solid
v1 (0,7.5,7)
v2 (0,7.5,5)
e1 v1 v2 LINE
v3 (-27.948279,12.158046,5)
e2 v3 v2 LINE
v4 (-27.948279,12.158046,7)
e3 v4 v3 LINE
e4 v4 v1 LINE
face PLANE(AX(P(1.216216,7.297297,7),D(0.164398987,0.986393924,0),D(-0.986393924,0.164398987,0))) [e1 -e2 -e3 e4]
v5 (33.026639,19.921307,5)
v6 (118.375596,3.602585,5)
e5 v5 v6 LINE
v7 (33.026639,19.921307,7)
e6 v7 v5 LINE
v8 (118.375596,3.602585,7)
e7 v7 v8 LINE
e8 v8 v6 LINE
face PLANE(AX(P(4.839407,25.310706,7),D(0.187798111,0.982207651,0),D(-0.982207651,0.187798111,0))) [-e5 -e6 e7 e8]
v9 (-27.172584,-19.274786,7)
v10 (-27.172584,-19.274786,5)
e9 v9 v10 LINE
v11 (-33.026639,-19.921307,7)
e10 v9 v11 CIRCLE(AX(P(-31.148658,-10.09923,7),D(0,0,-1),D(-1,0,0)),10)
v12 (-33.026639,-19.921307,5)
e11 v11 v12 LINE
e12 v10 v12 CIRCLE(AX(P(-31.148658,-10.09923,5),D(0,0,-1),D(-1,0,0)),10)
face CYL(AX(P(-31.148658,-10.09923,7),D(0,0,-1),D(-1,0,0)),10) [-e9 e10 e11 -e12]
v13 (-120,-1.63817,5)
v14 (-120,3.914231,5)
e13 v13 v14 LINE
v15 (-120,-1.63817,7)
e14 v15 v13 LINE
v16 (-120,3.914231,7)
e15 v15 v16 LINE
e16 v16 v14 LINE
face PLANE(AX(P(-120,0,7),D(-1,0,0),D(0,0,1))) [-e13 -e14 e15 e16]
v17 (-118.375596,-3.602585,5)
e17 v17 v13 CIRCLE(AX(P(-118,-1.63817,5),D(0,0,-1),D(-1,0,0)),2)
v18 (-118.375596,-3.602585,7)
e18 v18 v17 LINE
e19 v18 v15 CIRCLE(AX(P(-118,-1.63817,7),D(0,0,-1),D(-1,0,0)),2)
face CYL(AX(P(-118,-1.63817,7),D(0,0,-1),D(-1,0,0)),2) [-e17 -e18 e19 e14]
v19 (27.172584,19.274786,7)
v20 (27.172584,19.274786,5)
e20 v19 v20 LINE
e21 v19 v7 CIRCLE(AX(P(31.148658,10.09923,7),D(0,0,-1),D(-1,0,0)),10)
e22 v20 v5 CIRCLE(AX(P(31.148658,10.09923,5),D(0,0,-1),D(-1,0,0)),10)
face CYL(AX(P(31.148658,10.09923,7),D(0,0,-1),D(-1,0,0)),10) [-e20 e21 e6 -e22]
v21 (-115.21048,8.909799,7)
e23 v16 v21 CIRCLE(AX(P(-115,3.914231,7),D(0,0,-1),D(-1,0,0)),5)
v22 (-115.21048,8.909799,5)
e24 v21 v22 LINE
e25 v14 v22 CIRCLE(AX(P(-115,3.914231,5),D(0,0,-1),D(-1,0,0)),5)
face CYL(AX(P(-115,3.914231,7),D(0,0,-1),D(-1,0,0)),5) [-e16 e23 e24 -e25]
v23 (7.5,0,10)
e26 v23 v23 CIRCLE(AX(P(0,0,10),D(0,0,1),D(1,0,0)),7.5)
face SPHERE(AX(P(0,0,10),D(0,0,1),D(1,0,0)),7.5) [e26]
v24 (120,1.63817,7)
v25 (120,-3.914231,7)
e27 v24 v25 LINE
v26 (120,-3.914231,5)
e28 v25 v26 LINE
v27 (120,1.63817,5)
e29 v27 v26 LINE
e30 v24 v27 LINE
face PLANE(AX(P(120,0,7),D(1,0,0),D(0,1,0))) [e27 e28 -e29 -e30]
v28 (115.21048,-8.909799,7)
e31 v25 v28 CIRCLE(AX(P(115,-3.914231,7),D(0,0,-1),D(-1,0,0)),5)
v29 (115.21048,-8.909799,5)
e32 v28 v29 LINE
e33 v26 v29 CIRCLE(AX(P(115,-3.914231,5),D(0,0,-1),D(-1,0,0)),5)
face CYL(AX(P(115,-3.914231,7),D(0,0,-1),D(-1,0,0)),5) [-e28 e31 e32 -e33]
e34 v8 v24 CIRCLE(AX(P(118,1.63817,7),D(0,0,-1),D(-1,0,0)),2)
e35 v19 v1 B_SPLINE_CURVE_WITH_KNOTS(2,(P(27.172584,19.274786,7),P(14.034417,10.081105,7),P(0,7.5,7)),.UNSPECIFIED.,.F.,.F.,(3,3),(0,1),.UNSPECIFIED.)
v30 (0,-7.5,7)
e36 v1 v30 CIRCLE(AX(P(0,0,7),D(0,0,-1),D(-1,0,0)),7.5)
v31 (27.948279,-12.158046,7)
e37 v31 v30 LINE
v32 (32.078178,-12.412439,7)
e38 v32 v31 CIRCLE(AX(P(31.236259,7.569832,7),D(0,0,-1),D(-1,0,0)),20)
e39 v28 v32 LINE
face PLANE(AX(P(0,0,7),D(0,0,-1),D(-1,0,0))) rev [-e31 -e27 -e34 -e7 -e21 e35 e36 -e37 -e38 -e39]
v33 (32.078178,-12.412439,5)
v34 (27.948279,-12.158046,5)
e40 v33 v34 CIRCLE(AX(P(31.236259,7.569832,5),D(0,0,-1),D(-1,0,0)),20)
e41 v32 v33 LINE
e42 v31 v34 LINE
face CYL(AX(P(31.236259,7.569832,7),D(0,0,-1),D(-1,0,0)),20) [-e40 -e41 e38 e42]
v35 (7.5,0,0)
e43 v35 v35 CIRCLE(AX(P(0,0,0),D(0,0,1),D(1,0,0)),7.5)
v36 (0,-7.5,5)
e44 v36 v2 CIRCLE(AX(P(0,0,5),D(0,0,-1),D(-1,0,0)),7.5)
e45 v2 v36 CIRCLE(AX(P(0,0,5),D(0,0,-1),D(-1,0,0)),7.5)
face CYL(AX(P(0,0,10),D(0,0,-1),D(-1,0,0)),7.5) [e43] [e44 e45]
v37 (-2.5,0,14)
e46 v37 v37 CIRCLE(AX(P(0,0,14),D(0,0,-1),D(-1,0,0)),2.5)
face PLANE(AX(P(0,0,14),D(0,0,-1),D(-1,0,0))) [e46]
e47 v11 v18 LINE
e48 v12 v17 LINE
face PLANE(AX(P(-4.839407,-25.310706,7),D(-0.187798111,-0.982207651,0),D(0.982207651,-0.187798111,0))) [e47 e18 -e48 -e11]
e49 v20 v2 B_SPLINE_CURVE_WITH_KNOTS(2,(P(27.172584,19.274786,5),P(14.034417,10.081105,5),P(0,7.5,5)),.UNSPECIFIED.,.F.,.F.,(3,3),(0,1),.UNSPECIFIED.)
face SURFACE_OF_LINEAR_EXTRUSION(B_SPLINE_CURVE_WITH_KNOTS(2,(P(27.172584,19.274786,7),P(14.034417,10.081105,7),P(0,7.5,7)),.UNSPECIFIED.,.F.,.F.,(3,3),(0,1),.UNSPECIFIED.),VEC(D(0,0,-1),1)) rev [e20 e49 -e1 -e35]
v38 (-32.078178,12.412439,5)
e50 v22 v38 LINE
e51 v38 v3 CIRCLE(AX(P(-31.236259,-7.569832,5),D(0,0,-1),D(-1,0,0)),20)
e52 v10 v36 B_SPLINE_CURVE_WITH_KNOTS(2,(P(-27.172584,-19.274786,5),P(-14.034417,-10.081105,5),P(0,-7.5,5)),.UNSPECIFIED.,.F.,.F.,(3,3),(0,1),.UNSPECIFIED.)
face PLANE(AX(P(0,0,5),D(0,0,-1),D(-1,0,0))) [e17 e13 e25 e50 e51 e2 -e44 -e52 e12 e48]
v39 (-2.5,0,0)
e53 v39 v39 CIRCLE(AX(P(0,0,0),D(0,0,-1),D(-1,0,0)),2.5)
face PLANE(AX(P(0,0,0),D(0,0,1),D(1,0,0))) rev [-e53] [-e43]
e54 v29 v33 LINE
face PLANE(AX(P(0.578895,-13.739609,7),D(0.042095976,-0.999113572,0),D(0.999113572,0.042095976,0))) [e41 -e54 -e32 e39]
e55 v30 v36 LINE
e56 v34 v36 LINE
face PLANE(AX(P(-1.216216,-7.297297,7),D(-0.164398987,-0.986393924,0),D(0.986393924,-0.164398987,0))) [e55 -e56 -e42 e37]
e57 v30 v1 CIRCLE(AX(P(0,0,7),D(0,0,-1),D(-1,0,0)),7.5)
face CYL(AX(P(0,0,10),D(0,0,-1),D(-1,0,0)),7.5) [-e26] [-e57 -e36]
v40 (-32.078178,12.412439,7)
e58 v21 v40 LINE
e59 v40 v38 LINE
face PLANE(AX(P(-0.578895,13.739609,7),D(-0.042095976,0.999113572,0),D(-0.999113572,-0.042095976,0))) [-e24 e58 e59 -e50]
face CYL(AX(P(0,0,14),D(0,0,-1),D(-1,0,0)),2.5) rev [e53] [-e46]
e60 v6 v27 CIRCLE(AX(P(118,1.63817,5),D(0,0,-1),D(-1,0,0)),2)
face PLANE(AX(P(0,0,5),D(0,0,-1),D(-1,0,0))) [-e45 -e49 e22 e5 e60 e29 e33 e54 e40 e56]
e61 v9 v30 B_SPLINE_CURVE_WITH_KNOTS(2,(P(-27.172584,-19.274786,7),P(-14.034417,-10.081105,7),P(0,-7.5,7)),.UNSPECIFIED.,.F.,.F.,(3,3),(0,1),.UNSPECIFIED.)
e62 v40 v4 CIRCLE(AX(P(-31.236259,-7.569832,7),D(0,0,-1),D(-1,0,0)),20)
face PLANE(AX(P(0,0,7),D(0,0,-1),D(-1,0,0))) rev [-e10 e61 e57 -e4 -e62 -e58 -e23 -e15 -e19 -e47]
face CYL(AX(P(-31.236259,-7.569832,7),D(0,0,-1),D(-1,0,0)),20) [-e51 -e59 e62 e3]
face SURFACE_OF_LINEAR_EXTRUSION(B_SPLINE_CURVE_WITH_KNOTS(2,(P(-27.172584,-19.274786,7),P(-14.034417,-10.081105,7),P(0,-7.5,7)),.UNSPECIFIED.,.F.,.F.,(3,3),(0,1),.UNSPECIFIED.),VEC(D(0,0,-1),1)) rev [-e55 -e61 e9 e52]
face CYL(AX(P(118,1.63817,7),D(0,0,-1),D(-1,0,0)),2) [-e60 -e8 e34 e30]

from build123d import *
from build123d.topology import SkipClean

# Parameters (mm, degrees)
SKETCH_1_R          = 7.5
EXTRUDE_1_DEPTH     = 10
SKETCH_5_R          = 2.5
CUT_EXTRUDE_1_DEPTH = 14
EXTRUDE_2_DEPTH     = 2
SKETCH_8_R          = 2.5
CUT_EXTRUDE_2_DEPTH = 12


with BuildPart() as part:
    # 스케치1 → 보스-돌출1 (new body)
    with BuildSketch(Plane.XY):
        Circle(SKETCH_1_R)
    extrude(amount=EXTRUDE_1_DEPTH)

    # 스케치4 → 회전4 (revolve)
    with SkipClean():  # the faces are left unmerged after this step: merging them gives an invalid solid
        with BuildSketch(Plane(origin=(0, 0, 0), x_dir=(0, -1, 0), z_dir=(-1, 0, 0))):
            with BuildLine():
                ThreePointArc((7.5, 10), (0, 17.5), (-7.5, 10))
                Line((-7.5, 10), (7.5, 10))
            make_face()
        revolve(axis=Axis((0, 7.5, 10), (0, -1, 0)))

    # 스케치5 → 컷-돌출1 (cut)
    with SkipClean():  # the faces are left unmerged after this step: merging them gives an invalid solid
        with BuildSketch(Plane(origin=(0, 0, 0), x_dir=(-1, 0, 0), z_dir=(0, 0, -1))):
            Circle(SKETCH_5_R)
        extrude(amount=-CUT_EXTRUDE_1_DEPTH, mode=Mode.SUBTRACT)

    # 스케치7 → 보스-돌출2 (add)
    with BuildSketch(Plane(origin=(0, 0, 5), x_dir=(-1, 0, 0), z_dir=(0, 0, -1))):
        with BuildLine():
            ThreePointArc((118.375596223, -3.602585224), (119.541296929, -2.912690922), (120, -1.638169923))
            Line((120, -1.638169923), (120, 3.91423134))
            ThreePointArc((120, 3.91423134), (118.609182692, 7.374549287), (115.210479882, 8.909799198))
            Line((115.210479882, 8.909799198), (32.07817821, 12.412439443))
            ThreePointArc((32.07817821, 12.412439443), (30.006632076, 12.392332685), (27.948278937, 12.158046489))
            Line((27.948278937, 12.158046489), (0, 7.5))
            add(Edge.make_bspline(
                [(-27.172583756, 19.274786294), (-14.034416748, 10.081105305), (0, 7.5)],
                knots=[0, 0, 0, 1, 1, 1], degree=2))
            ThreePointArc((-27.172583756, 19.274786294), (-30.05093506, 20.03879764), (-33.026639247, 19.921306549))
            Line((-33.026639247, 19.921306549), (-118.375596223, 3.602585224))
            ThreePointArc((-118.375596223, 3.602585224), (-119.541296929, 2.912690922), (-120, 1.638169923))
            Line((-120, 1.638169923), (-120, -3.91423134))
            ThreePointArc((-120, -3.91423134), (-118.609182692, -7.374549287), (-115.210479882, -8.909799198))
            Line((-115.210479882, -8.909799198), (-32.07817821, -12.412439443))
            ThreePointArc((-32.07817821, -12.412439443), (-30.006632076, -12.392332685), (-27.948278937, -12.158046489))
            Line((-27.948278937, -12.158046489), (0, -7.5))
            add(Edge.make_bspline(
                [(27.172583756, -19.274786294), (14.034416748, -10.081105305), (0, -7.5)],
                knots=[0, 0, 0, 1, 1, 1], degree=2))
            ThreePointArc((27.172583756, -19.274786294), (30.05093506, -20.03879764), (33.026639247, -19.921306549))
            Line((33.026639247, -19.921306549), (118.375596223, -3.602585224))
        make_face()
    extrude(amount=-EXTRUDE_2_DEPTH)

    # 스케치8 → 컷-돌출2 (cut)
    with BuildSketch(Plane(origin=(0, 0, 0), x_dir=(-1, 0, 0), z_dir=(0, 0, -1))):
        Circle(SKETCH_8_R)
    extrude(amount=-CUT_EXTRUDE_2_DEPTH, mode=Mode.SUBTRACT)


solid = part.part
